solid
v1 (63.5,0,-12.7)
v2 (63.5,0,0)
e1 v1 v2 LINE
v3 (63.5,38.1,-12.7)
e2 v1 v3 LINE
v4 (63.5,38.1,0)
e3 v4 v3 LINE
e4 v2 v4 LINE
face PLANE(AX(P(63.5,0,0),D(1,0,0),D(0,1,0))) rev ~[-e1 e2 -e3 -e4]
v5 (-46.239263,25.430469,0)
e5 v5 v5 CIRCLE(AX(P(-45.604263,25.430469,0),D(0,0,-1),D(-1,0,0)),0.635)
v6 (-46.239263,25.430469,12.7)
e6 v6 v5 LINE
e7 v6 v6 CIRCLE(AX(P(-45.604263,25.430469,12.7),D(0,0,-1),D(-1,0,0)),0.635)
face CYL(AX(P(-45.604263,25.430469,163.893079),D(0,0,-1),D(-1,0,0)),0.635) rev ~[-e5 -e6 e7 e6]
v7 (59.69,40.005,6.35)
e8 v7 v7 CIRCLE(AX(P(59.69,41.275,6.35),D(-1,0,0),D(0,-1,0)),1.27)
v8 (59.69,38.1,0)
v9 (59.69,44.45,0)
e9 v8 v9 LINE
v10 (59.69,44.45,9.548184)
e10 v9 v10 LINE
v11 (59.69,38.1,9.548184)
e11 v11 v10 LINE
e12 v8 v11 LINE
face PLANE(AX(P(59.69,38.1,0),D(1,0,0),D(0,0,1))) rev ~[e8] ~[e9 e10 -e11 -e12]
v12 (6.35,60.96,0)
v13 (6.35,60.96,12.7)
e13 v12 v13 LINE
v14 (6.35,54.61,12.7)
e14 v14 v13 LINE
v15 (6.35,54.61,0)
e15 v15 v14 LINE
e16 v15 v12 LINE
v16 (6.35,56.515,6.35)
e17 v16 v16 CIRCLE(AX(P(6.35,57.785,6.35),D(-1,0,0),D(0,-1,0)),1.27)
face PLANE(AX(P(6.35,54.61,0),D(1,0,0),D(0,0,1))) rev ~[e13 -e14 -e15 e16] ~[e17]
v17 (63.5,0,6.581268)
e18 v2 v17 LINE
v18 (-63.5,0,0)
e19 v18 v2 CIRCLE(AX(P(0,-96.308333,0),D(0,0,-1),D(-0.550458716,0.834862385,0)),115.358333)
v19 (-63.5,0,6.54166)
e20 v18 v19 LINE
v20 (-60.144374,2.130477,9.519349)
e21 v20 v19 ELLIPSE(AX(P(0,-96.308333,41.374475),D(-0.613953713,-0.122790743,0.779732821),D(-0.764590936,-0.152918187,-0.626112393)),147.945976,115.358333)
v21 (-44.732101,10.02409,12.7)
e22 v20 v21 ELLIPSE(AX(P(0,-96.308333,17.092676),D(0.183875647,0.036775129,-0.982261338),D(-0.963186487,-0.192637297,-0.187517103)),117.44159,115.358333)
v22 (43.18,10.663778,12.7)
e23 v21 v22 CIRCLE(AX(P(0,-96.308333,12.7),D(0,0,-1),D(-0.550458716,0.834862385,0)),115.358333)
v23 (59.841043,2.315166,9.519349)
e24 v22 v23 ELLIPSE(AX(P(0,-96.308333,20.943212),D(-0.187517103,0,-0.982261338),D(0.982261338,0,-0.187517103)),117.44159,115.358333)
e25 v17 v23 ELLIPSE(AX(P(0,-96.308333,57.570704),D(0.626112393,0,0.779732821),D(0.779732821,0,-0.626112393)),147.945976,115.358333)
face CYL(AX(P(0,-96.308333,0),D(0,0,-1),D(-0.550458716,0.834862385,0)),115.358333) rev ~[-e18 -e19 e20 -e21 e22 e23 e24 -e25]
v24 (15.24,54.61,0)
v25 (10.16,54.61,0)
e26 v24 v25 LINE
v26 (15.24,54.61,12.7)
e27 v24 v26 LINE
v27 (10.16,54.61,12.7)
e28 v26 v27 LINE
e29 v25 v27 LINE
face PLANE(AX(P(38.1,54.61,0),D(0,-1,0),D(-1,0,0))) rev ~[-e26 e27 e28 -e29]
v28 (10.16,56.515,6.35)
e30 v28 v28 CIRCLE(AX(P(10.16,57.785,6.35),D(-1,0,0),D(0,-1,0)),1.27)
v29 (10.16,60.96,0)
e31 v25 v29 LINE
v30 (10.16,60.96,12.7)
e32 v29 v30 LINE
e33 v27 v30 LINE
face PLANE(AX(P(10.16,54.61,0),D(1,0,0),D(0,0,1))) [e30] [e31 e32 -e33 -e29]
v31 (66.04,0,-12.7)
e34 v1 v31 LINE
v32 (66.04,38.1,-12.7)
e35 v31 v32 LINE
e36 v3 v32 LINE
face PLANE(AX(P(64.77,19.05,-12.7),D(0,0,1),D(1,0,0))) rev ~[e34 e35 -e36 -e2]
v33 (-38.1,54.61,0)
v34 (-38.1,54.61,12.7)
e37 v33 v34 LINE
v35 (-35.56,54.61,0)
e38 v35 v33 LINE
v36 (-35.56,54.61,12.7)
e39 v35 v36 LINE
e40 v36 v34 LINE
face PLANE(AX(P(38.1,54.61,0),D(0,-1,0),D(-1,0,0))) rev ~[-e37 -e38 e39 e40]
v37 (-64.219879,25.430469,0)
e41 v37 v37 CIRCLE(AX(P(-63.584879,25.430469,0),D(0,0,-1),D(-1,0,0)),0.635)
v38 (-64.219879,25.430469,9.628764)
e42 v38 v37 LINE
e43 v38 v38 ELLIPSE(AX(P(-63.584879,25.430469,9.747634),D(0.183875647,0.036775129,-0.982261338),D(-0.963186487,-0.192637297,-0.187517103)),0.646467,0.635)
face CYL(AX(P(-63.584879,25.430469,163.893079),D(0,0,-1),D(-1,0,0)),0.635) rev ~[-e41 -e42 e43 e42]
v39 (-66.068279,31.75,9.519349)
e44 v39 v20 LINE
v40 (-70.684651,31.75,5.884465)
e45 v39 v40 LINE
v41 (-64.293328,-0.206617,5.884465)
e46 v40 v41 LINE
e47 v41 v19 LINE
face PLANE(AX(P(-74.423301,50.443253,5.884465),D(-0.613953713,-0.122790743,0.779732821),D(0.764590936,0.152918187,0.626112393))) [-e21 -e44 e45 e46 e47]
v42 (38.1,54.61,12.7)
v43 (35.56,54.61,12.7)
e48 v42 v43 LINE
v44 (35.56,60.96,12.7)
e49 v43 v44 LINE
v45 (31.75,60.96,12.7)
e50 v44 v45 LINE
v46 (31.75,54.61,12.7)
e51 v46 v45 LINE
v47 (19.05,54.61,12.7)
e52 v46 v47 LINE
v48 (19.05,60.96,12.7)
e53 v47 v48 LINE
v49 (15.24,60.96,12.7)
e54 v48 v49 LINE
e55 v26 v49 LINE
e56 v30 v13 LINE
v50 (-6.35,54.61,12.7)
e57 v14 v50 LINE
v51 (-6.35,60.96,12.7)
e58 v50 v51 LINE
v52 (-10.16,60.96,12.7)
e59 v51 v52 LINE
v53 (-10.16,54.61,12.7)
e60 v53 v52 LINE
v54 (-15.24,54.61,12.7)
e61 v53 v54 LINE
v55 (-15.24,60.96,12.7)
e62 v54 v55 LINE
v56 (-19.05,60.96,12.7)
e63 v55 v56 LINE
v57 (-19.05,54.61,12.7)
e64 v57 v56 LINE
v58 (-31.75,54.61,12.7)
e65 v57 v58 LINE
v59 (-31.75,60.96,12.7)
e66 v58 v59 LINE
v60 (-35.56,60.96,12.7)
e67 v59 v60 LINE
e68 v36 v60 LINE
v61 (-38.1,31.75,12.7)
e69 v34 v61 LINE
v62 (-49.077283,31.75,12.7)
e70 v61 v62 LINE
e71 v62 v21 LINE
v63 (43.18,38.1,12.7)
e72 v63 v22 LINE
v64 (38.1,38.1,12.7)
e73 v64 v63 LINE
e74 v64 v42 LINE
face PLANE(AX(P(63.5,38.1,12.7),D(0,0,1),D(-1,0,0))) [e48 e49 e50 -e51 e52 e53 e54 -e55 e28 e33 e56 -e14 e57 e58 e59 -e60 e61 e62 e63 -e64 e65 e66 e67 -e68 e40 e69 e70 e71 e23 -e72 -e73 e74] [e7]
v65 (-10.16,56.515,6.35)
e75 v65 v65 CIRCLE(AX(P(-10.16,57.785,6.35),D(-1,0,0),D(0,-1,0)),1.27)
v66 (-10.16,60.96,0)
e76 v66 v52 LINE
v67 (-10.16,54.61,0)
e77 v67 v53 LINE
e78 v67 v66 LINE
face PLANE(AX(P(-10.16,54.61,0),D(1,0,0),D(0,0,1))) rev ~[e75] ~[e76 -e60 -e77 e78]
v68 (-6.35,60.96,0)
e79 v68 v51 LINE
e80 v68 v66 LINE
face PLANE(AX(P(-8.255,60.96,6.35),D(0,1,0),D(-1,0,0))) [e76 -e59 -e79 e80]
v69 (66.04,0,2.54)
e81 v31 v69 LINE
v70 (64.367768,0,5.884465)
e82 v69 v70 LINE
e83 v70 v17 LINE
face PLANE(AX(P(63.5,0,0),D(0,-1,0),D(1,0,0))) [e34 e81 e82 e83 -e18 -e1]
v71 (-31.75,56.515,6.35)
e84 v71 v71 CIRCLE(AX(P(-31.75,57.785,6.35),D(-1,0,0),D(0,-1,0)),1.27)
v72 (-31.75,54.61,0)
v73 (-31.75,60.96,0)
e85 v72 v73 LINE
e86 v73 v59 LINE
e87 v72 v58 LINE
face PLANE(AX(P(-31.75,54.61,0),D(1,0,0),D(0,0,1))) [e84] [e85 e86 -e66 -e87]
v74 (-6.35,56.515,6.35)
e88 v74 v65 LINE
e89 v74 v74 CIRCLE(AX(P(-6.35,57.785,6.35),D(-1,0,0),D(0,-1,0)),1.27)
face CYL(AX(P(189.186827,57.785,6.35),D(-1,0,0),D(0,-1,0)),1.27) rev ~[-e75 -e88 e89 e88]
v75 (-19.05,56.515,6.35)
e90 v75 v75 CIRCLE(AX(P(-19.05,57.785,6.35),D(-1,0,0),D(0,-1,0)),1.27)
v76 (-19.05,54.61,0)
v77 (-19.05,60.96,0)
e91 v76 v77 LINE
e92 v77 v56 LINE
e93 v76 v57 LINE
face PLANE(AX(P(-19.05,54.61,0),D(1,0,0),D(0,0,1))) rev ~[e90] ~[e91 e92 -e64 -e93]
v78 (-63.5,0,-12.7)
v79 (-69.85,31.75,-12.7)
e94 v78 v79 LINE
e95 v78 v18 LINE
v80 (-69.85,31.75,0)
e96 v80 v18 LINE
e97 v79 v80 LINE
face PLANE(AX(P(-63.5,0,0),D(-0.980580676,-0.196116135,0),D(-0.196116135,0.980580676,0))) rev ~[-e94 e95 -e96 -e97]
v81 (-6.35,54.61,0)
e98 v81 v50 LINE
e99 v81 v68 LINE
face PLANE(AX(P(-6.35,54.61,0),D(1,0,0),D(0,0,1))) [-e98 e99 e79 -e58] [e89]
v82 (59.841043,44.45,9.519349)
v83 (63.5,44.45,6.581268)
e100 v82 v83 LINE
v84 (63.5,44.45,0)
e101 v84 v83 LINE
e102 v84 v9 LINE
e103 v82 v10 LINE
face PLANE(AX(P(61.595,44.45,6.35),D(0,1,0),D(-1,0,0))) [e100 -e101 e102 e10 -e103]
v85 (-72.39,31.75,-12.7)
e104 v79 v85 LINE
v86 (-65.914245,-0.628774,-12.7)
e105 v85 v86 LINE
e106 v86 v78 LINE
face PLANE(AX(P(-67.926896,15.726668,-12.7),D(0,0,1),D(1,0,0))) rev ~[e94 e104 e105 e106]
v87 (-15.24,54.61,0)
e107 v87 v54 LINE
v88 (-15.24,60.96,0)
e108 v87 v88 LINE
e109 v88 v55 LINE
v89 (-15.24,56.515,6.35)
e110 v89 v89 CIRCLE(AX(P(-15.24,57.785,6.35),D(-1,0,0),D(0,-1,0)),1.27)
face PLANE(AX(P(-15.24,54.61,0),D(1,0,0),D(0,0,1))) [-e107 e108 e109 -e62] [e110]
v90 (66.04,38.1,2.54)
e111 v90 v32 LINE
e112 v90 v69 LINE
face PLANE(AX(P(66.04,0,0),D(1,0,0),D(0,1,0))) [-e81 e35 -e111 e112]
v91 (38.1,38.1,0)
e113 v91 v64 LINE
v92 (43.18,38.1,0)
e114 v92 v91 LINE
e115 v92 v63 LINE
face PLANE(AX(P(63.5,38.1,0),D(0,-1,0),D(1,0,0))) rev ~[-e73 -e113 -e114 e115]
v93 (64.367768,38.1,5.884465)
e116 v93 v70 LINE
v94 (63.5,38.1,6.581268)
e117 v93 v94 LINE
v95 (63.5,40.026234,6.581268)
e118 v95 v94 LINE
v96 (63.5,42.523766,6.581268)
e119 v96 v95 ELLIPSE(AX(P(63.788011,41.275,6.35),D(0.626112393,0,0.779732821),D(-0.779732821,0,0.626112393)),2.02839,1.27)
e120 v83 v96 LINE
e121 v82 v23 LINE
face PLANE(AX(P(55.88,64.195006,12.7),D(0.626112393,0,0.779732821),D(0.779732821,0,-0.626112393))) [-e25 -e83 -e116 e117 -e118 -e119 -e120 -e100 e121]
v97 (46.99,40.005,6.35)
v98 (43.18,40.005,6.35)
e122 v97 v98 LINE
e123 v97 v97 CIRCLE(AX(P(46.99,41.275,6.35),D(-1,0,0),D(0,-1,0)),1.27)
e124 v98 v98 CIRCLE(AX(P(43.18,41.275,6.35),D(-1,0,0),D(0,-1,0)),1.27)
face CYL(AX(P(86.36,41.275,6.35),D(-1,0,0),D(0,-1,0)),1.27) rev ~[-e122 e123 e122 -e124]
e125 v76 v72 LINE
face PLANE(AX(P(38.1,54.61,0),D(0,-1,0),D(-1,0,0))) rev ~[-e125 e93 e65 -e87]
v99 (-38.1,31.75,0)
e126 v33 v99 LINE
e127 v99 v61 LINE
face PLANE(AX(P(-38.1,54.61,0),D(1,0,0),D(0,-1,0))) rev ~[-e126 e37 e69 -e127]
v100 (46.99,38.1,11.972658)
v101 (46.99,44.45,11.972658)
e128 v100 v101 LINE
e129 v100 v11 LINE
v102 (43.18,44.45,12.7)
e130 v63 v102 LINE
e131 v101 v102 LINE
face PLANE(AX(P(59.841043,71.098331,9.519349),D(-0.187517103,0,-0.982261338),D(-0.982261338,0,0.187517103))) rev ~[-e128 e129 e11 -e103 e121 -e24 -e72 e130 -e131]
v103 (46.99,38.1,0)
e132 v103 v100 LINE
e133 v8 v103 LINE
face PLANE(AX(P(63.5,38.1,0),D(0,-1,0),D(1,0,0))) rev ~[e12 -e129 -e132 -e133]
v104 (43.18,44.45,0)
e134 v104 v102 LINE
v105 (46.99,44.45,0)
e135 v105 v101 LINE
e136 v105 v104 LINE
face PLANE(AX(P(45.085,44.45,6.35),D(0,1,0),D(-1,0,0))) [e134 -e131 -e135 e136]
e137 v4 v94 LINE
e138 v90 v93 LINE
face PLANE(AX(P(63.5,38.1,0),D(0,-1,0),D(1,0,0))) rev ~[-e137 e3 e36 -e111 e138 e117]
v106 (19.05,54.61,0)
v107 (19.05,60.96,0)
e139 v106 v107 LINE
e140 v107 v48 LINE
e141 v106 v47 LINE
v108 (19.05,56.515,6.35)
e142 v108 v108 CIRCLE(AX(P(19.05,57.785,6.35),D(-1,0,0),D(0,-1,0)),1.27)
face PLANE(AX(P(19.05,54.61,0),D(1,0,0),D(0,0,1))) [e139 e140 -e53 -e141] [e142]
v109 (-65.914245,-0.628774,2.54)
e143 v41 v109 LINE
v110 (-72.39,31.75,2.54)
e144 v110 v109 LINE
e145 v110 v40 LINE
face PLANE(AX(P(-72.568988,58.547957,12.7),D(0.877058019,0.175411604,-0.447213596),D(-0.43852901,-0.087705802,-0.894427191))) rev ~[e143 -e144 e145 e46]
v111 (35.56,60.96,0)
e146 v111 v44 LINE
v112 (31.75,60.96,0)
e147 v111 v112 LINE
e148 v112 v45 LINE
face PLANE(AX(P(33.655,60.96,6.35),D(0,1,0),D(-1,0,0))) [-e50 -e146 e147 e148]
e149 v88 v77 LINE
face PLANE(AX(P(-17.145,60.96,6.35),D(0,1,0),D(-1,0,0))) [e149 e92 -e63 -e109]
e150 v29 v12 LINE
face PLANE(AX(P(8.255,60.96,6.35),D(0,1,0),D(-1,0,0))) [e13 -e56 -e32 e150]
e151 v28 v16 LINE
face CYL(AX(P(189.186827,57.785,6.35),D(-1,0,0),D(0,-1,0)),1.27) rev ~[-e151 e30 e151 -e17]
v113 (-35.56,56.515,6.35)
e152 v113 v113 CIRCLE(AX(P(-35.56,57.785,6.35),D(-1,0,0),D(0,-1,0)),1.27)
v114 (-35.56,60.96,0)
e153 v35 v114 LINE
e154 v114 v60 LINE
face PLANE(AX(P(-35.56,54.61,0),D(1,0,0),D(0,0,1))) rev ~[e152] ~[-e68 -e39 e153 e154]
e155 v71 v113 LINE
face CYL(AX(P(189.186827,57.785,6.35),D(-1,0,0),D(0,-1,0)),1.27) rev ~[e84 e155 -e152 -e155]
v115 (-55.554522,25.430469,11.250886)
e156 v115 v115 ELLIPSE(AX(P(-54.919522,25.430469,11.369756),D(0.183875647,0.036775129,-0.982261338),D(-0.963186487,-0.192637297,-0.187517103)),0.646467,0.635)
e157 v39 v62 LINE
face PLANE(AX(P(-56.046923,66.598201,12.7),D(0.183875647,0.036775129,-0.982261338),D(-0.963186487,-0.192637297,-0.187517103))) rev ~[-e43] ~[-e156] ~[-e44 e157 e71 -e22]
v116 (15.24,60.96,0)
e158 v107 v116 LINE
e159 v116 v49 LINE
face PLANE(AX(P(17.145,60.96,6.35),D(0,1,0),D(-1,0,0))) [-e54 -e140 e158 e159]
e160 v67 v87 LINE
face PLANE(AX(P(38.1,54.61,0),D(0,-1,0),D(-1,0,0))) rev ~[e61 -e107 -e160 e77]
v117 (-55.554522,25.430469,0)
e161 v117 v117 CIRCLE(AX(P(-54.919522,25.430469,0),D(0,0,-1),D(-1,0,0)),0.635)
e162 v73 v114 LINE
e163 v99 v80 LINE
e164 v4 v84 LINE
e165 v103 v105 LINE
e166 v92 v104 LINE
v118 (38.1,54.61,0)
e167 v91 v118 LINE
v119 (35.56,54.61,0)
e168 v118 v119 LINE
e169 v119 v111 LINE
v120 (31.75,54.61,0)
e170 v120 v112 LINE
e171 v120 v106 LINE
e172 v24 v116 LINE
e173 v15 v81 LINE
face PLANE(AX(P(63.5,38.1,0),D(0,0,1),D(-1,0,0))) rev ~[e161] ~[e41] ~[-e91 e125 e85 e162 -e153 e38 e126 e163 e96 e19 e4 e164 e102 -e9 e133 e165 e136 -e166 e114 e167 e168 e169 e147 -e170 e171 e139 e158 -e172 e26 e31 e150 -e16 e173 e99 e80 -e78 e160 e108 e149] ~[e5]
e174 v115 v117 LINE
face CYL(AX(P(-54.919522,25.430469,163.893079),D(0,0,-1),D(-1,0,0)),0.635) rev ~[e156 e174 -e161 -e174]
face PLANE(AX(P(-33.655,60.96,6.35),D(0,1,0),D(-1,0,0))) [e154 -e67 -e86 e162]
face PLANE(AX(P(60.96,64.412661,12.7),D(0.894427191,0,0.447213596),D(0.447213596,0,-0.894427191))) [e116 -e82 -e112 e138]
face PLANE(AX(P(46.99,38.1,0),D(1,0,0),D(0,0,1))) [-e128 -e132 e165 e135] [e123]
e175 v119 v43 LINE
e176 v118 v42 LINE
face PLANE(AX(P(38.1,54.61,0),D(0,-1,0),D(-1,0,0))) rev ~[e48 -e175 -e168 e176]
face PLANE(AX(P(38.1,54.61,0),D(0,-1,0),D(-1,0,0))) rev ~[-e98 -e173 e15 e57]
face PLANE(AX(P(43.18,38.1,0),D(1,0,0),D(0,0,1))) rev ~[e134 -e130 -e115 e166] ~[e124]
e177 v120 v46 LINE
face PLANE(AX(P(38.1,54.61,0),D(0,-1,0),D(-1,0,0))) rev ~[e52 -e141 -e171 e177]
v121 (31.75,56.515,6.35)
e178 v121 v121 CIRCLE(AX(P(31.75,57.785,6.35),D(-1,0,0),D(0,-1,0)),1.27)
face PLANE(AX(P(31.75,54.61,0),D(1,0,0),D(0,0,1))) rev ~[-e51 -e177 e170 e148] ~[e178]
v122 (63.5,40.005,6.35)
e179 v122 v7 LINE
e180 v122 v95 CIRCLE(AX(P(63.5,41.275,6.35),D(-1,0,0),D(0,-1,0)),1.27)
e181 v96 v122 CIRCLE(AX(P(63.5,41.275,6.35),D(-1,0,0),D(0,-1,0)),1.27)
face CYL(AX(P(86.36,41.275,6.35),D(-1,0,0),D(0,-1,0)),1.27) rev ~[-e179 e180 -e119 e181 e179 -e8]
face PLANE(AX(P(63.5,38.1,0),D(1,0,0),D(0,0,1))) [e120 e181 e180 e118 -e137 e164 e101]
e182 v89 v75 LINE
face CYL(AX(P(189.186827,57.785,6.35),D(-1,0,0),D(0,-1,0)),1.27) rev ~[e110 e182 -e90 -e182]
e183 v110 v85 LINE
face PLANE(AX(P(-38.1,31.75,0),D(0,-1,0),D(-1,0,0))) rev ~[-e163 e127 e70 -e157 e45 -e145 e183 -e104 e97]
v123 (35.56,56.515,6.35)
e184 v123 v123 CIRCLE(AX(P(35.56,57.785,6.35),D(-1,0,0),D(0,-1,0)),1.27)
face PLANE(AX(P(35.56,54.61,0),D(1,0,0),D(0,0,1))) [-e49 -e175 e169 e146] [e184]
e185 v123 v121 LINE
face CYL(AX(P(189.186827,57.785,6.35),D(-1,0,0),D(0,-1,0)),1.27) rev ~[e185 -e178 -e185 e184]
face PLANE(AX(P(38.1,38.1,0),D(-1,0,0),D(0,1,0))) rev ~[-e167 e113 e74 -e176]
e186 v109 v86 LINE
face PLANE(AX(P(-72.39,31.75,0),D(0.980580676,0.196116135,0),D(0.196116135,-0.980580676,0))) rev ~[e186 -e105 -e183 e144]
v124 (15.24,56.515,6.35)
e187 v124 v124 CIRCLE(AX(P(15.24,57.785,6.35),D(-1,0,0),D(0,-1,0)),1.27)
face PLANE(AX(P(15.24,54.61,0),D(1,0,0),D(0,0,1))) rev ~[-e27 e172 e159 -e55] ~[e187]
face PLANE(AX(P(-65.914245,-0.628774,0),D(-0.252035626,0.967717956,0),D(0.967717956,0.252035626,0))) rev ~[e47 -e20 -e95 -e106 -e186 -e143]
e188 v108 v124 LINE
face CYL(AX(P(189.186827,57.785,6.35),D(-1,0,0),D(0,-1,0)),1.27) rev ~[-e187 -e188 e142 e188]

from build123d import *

# Parameters (mm, degrees)
F1_DEPTH     = 12.7
F0_W         = 2.54
F0_H         = 38.1
F2_DEPTH     = 12.7
F4_D         = 1.27
F5_W         = 3.81
F5_H         = 12.7
F6_DEPTH     = 6.35
F8_D         = 2.54
F9_W         = 3.81
F9_H         = 12.7
F10_DEPTH    = 6.35
F12_D        = 2.54
F12_DEPTH    = 22.86
F12_TIP      = 0.7630929862
F13_T1_DEPTH = 90.7253227153
F13_T3_DEPTH = 85.6453227153
F14_T1_DEPTH = 70.3362845074
F14_T3_DEPTH = 82.312532111
F15_T1_DEPTH = 94.0409858467
F15_T3_DEPTH = 99.4843801619


# Not quite as in the source:
# - a fillet or chamfer that OpenCascade refuses, or shapes differently, is made with other operations: its cross-section is extruded or revolved along the edge and cut away or added


with BuildPart() as f1:
    # F0 (on Top) → F1 (new body)
    with BuildSketch(Plane.XY):
        with BuildLine():
            ThreePointArc((-63.5, 0), (0, 19.05), (63.5, 0))
            Line((63.5, 0), (63.5, 38.1))
            Line((63.5, 38.1), (38.1, 38.1))
            Line((38.1, 38.1), (38.1, 54.61))
            Line((38.1, 54.61), (-38.1, 54.61))
            Line((-38.1, 54.61), (-38.1, 31.75))
            Line((-38.1, 31.75), (-69.85, 31.75))
            Line((-69.85, 31.75), (-63.5, 0))
        make_face()
    extrude(amount=F1_DEPTH)

    # F0 (on Top) → F2 (join, symmetric)
    with BuildSketch(Plane.XY):
        Polygon((-65.9142452177, -0.6287739113), (-63.5, 0), (-69.85, 31.75), (-72.39, 31.75), align=None)
        with Locations((64.77, 19.05)):
            Rectangle(F0_W, F0_H)
    extrude(amount=F2_DEPTH, both=True)

    # F4 (through all)
    with Locations(Plane.XY.offset(12.7)):
        with Locations((-45.604262501, 25.4304688424), (-54.9195222557, 25.4304688424), (-63.5848790407, 25.4304688424)):
            Hole(F4_D / 2)

    # F5 (on face) → F6 (join)
    with BuildSketch(Plane(origin=(0, 54.61, 0), x_dir=(-1, 0, 0), z_dir=(0, 1, 0))):
        with Locations((-33.655, 6.35)):
            Rectangle(F5_W, F5_H)
        with Locations((-17.145, 6.35)):
            Rectangle(F5_W, F5_H)
        with Locations((-8.255, 6.35)):
            Rectangle(F5_W, F5_H)
        with Locations((8.255, 6.35)):
            Rectangle(F5_W, F5_H)
        with Locations((17.145, 6.35)):
            Rectangle(F5_W, F5_H)
        with Locations((33.655, 6.35)):
            Rectangle(F5_W, F5_H)
    extrude(amount=F6_DEPTH)

    # F8 (through all)
    with Locations(Plane.YZ.offset(35.56)):
        with Locations((57.785, 6.35)):
            Hole(F8_D / 2)

    # F9 (on face) → F10 (join)
    with BuildSketch(Plane(origin=(0, 38.1, 0), x_dir=(-1, 0, 0), z_dir=(0, 1, 0))):
        with Locations((-45.085, 6.35)):
            Rectangle(F9_W, F9_H)
        with Locations((-61.595, 6.35)):
            Rectangle(F9_W, F9_H)
    extrude(amount=F10_DEPTH)

    # F12
    with Locations(Plane.YZ.offset(63.5)):
        with Locations((41.275, 6.35)):
            Hole(F12_D / 2, depth=F12_DEPTH)
            with Locations((0, 0, -(F12_DEPTH + F12_TIP / 2))):  # 118° drill point
                Cone(0, F12_D / 2, F12_TIP, mode=Mode.SUBTRACT)

    # F13: chamfer of 5.08 x 10.16 on 2 edges, made by hand

    # F13_s2 → F13_t1 (cut)
    with BuildSketch(Plane.XZ.offset(-64.4126613577)):
        Polygon((60.96, 12.7), (66.04, 2.54), (66.04, 12.7), align=None)
    extrude(amount=F13_T1_DEPTH, mode=Mode.SUBTRACT)

    # F13_s4 → F13_t3 (cut)
    with BuildSketch(Plane(origin=(-14.0503374507, 70.2516872533, 0), x_dir=(0, 0, 1), z_dir=(0.1961161351, -0.9805806757, 0))):
        Polygon((12.7, 59.6775478226), (2.54, 64.7575478226), (12.7, 64.7575478226), align=None)
    extrude(amount=F13_T3_DEPTH, mode=Mode.SUBTRACT)

    # F14: chamfer of 5.08 x 7.62 on 2 edges, made by hand

    # F14_s2 → F14_t1 (cut)
    with BuildSketch(Plane(origin=(-12.5630602506, 62.8153012532, 0), x_dir=(0, 0, 1), z_dir=(0.1961161351, -0.9805806757, 0))):
        Polygon((5.8844648046, 63.0853154203), (12.7, 54.5975478226), (12.7, 59.6775478226), align=None)
    extrude(amount=F14_T1_DEPTH, mode=Mode.SUBTRACT)

    # F14_s4 → F14_t3 (cut)
    with BuildSketch(Plane.XZ.offset(-64.1950058926)):
        Polygon((55.88, 12.7), (64.3677675977, 5.8844648046), (60.96, 12.7), align=None)
    extrude(amount=F14_T3_DEPTH, mode=Mode.SUBTRACT)

    # F15: chamfer of 12.7 x 5.08 on 2 edges, made by hand

    # F15_s2 → F15_t1 (cut)
    with BuildSketch(Plane(origin=(-14.9629972051, 74.8149860255, 0), x_dir=(0, 0, 1), z_dir=(0.1961161351, -0.9805806757, 0))):
        Polygon((12.7, 41.8975478226), (9.5193490439, 58.5585905509), (12.7, 54.5975478226), align=None)
    extrude(amount=F15_T1_DEPTH, mode=Mode.SUBTRACT)

    # F15_s4 → F15_t3 (cut)
    with BuildSketch(Plane.XZ.offset(-71.0983312548)):
        Polygon((59.8410427283, 9.5193490439), (43.18, 12.7), (55.88, 12.7), align=None)
    extrude(amount=F15_T3_DEPTH, mode=Mode.SUBTRACT)


solid = f1.part
